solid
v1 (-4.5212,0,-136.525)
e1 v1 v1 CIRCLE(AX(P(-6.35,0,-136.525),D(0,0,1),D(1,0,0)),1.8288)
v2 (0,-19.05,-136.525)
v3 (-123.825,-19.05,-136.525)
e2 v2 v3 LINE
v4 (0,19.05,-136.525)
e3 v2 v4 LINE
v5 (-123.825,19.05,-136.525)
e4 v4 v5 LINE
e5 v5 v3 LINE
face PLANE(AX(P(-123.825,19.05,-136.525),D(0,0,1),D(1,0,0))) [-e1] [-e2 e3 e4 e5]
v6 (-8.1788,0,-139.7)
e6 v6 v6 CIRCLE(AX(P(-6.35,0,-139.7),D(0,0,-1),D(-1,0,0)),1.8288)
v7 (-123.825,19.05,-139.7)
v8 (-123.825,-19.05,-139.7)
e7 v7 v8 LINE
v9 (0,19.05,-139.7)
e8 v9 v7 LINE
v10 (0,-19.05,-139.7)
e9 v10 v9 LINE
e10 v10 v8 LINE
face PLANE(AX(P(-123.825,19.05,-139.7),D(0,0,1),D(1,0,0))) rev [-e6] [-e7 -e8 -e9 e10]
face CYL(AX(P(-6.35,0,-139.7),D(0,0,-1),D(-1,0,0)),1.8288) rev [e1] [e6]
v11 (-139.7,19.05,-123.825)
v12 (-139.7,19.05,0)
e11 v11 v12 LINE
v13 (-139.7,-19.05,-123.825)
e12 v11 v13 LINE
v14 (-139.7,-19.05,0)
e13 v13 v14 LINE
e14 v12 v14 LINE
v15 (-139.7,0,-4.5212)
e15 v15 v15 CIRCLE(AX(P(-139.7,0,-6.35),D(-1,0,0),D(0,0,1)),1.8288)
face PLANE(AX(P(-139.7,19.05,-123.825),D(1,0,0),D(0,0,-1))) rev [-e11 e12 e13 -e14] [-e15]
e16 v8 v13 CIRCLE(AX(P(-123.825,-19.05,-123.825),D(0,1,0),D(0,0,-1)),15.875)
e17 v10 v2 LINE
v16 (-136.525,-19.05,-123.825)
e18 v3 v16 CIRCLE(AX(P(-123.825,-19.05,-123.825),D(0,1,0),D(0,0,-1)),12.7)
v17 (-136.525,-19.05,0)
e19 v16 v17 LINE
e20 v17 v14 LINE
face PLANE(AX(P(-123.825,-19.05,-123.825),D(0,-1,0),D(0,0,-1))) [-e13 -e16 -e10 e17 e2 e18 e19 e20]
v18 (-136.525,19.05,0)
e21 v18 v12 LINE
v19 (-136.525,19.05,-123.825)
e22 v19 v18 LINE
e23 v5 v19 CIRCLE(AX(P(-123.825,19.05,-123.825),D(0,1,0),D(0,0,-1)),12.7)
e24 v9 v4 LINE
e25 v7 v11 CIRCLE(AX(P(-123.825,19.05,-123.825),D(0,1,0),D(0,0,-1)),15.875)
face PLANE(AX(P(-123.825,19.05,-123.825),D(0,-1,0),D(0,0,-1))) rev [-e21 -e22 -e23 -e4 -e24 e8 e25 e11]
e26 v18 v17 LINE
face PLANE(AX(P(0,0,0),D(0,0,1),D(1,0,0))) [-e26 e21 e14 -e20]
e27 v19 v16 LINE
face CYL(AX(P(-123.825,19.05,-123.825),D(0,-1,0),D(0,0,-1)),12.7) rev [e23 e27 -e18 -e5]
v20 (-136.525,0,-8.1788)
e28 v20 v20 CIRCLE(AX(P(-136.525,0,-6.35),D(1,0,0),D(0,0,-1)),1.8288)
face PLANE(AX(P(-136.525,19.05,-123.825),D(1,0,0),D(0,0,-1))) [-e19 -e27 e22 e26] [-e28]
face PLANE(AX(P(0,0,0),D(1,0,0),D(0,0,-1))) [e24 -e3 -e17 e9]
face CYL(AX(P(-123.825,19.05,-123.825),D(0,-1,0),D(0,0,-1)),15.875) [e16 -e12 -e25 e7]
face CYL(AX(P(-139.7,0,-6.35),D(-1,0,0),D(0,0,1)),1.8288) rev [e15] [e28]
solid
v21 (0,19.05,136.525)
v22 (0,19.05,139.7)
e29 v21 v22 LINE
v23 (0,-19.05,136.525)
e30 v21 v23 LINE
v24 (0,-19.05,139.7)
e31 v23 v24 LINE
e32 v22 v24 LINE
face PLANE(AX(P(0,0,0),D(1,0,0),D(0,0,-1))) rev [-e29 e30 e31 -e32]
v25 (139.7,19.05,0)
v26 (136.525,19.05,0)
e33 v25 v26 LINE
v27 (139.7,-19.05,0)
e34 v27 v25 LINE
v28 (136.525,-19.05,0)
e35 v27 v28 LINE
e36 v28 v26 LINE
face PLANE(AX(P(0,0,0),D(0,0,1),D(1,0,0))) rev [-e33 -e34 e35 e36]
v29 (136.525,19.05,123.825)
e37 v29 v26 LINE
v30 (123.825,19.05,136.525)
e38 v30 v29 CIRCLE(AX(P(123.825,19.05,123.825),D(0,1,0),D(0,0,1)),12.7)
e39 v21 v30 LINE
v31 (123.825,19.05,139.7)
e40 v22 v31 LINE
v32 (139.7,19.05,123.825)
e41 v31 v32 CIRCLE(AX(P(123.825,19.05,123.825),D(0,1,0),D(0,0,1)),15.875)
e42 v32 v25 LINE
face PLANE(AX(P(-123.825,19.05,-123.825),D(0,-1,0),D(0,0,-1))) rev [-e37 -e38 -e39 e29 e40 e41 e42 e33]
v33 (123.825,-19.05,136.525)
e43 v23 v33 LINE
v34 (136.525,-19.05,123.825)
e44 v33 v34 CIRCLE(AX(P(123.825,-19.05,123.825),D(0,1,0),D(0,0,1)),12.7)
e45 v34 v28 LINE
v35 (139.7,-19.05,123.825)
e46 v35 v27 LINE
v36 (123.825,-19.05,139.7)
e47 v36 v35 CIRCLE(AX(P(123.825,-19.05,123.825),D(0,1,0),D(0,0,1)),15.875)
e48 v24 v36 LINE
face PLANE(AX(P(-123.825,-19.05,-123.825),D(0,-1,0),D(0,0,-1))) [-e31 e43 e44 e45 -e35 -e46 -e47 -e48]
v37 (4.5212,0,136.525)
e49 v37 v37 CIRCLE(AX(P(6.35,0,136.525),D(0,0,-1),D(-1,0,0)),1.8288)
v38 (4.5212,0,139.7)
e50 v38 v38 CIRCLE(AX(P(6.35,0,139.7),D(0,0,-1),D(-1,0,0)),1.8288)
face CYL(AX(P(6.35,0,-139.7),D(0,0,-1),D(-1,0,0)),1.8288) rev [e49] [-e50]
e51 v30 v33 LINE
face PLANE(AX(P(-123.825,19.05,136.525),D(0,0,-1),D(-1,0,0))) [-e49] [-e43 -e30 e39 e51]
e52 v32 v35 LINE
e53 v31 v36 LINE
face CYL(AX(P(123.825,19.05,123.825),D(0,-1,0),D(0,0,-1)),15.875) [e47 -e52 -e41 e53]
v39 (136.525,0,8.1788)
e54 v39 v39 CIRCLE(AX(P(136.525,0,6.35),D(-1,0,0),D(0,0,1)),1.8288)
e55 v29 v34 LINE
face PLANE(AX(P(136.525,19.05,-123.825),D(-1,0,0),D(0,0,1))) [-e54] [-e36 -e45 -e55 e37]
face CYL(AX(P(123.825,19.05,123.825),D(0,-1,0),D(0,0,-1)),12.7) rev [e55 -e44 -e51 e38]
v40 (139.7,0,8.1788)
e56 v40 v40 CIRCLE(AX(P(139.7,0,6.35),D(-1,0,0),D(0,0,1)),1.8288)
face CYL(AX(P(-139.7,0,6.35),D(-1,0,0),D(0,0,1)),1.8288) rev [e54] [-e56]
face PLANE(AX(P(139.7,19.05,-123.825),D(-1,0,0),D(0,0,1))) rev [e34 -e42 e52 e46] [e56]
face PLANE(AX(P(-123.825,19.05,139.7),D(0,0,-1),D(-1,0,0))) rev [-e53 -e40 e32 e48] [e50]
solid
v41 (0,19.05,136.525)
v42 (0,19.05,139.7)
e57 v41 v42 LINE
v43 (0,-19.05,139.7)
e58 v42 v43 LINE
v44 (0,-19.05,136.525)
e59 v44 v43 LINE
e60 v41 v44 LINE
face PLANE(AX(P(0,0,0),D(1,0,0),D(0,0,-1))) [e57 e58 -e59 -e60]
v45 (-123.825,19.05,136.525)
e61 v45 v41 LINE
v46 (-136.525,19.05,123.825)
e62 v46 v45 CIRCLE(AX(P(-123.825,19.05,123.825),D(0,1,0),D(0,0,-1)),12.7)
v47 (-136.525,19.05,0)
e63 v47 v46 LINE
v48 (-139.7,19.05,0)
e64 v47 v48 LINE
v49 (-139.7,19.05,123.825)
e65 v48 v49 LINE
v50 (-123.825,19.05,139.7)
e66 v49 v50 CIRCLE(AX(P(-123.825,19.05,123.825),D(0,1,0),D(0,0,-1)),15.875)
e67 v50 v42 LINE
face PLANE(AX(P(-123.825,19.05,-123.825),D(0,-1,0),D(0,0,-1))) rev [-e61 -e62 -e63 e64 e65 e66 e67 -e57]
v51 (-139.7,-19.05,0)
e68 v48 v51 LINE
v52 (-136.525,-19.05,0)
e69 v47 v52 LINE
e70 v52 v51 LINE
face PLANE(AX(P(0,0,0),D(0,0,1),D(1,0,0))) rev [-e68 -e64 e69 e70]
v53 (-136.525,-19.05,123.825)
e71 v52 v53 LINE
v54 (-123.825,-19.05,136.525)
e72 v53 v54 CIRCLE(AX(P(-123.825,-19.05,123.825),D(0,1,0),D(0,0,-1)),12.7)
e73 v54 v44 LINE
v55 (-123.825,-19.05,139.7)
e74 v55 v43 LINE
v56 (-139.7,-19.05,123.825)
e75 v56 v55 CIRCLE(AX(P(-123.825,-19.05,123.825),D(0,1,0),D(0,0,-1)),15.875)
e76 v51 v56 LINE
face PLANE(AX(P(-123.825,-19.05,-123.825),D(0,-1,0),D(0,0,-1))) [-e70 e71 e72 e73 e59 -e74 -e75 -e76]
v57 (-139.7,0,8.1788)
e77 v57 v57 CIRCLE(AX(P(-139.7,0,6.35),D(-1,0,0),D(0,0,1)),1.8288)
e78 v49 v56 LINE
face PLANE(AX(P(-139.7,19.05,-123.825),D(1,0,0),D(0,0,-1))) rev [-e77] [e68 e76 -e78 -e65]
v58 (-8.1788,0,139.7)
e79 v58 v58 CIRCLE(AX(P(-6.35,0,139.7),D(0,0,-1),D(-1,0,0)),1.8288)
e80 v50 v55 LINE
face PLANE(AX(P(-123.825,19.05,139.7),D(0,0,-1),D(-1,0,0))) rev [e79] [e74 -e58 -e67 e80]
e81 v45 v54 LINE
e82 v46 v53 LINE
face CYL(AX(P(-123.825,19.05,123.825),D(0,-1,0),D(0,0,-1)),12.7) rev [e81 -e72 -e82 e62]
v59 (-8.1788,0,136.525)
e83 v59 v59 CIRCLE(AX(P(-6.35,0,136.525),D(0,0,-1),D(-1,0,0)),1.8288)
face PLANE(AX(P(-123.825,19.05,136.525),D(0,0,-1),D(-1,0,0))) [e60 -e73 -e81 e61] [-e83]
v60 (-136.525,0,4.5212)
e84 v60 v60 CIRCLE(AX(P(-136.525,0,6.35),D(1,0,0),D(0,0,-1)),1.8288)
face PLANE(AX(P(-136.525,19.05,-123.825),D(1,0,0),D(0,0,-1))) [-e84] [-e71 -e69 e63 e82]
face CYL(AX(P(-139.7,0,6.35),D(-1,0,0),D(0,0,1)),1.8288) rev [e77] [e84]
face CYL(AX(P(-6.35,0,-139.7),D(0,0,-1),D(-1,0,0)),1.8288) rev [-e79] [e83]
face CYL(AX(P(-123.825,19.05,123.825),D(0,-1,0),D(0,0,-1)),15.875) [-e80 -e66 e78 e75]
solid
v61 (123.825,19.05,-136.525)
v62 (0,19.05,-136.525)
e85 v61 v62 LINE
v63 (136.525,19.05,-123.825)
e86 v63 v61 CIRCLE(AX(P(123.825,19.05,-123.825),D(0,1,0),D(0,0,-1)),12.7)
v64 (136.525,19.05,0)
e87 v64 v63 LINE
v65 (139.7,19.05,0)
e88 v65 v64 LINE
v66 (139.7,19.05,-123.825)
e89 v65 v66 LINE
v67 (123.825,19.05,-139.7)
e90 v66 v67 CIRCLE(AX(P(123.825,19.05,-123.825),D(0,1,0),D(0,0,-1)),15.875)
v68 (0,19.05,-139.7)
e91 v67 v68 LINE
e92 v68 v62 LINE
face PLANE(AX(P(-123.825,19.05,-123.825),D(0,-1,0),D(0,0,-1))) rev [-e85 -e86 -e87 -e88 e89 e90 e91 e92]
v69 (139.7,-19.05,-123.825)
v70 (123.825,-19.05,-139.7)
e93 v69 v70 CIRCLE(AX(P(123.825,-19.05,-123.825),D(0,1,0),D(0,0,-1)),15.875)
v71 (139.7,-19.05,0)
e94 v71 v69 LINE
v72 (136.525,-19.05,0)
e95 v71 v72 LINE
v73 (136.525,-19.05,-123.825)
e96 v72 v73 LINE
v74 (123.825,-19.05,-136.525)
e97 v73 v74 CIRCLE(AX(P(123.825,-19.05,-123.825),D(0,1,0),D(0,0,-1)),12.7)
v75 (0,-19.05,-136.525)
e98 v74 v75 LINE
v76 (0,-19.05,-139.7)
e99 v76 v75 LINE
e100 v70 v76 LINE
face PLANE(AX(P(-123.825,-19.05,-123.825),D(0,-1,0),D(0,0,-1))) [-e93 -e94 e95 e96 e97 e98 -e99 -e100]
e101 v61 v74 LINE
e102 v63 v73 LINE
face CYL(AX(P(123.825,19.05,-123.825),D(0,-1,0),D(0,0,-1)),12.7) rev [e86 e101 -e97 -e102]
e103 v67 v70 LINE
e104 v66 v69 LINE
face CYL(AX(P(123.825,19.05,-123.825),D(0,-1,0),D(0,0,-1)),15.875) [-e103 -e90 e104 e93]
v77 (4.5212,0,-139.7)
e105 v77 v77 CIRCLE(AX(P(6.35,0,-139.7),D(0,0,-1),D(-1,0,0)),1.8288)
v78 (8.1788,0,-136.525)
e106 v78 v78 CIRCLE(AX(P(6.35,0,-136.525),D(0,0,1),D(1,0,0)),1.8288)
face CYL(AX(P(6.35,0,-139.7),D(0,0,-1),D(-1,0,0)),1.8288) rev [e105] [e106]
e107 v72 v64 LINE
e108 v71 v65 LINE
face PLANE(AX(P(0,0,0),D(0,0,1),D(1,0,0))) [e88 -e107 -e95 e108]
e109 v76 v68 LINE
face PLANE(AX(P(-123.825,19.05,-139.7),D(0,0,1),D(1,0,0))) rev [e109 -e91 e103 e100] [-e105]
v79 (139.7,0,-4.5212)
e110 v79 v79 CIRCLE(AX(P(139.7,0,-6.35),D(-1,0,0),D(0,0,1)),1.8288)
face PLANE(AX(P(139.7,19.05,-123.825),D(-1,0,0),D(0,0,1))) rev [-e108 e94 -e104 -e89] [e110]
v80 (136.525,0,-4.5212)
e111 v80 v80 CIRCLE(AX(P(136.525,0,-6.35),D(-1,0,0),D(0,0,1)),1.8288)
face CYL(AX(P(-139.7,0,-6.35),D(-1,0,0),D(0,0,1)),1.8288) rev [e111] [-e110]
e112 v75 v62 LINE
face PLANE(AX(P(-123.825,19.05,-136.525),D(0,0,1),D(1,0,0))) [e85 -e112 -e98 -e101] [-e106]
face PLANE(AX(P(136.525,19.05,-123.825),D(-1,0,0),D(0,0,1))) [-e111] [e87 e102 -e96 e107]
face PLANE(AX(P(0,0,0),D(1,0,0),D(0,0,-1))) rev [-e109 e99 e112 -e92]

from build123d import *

# Parameters (mm, degrees)
BOSS_EXTRUDE1_DEPTH            = 19.05
SPLIT1_START                   = -19.05
SPLIT1_DEPTH                   = 38.1
SPLIT1_START_2                 = -139.7
SPLIT1_2_OUTLINE_W             = 38.1
SPLIT1_2_OUTLINE_H             = 279.4
SPLIT1_2_DEPTH                 = 139.7
SPLIT1_3_OUTLINE_W             = 38.1
SPLIT1_3_OUTLINE_H             = 139.7
SPLIT1_3_DEPTH                 = 139.7
SPLIT1_4_DEPTH                 = 38.1
SPLIT1_5_DEPTH                 = 38.1
SKETCH6_W                      = 1.8288
SKETCH6_H                      = 279.4
F_6_CLEARANCE_HOLE1_AT_2_COUNT = 2
F_6_CLEARANCE_HOLE1_AT_2_PITCH = 12.7
CIRPATTERN1_COUNT              = 2
CIRPATTERN1_ANGLE              = 90
CIRPATTERN1_COPY_1_SKETCH_W    = 1.8288
CIRPATTERN1_COPY_1_SKETCH_H    = 279.4


# Read off the part's stored shape, not the designer's step: Split1
with BuildPart() as part:
    # Sketch1 → Boss-Extrude1 (new, symmetric)
    with BuildSketch(Plane(origin=(0, 0, 0), x_dir=(1, 0, 0), z_dir=(0, 1, 0))):
        with BuildLine():
            Line((-123.825, 139.7), (123.825, 139.7))
            ThreePointArc((123.825, 139.7), (135.050320151, 135.050320151), (139.7, 123.825))
            Line((139.7, 123.825), (139.7, -123.825))
            ThreePointArc((139.7, -123.825), (135.050320151, -135.050320151), (123.825, -139.7))
            Line((123.825, -139.7), (-123.825, -139.7))
            ThreePointArc((-123.825, -139.7), (-135.050320151, -135.050320151), (-139.7, -123.825))
            Line((-139.7, -123.825), (-139.7, 123.825))
            ThreePointArc((-139.7, 123.825), (-135.050320151, 135.050320151), (-123.825, 139.7))
        make_face()
        with BuildLine():
            Line((-123.825, 136.525), (123.825, 136.525))
            ThreePointArc((123.825, 136.525), (132.805256121, 132.805256121), (136.525, 123.825))
            Line((136.525, 123.825), (136.525, -123.825))
            ThreePointArc((136.525, -123.825), (132.805256121, -132.805256121), (123.825, -136.525))
            Line((123.825, -136.525), (-123.825, -136.525))
            ThreePointArc((-123.825, -136.525), (-132.805256121, -132.805256121), (-136.525, -123.825))
            Line((-136.525, -123.825), (-136.525, 123.825))
            ThreePointArc((-136.525, 123.825), (-132.805256121, 132.805256121), (-123.825, 136.525))
        make_face(mode=Mode.SUBTRACT)
    extrude(amount=BOSS_EXTRUDE1_DEPTH, both=True)

    # Split1 2 outline → Split1 2 (cut)
    with BuildSketch(Plane.YZ.offset(SPLIT1_START_2)):
        Rectangle(SPLIT1_2_OUTLINE_W, SPLIT1_2_OUTLINE_H)
    extrude(amount=SPLIT1_2_DEPTH, mode=Mode.SUBTRACT)

    # Split1 3 outline → Split1 3 (cut)
    with BuildSketch(Plane.YZ):
        with Locations((0, -69.85)):
            Rectangle(SPLIT1_3_OUTLINE_W, SPLIT1_3_OUTLINE_H)
    extrude(amount=SPLIT1_3_DEPTH, mode=Mode.SUBTRACT)


with BuildPart() as body_2:
    # Split1 outline → Split1 (new body)
    with BuildSketch(Plane(origin=(0, 0, 0), x_dir=(1, 0, 0), z_dir=(0, 1, 0)).offset(SPLIT1_START)):
        with BuildLine():
            Line((-123.825, 136.525), (0, 136.525))
            Line((0, 136.525), (0, 139.7))
            Line((0, 139.7), (-123.825, 139.7))
            ThreePointArc((-123.825, 139.7), (-135.050320151, 135.050320151), (-139.7, 123.825))
            Line((-139.7, 123.825), (-139.7, 0))
            Line((-139.7, 0), (-136.525, 0))
            Line((-136.525, 0), (-136.525, 123.825))
            ThreePointArc((-136.525, 123.825), (-132.805256121, 132.805256121), (-123.825, 136.525))
        make_face()
    extrude(amount=SPLIT1_DEPTH)


with BuildPart() as body_3:
    # Split1 4 outline → Split1 4 (new body)
    with BuildSketch(Plane(origin=(0, 0, 0), x_dir=(1, 0, 0), z_dir=(0, 1, 0)).offset(SPLIT1_START)):
        with BuildLine():
            Line((-136.525, 0), (-139.7, 0))
            Line((-139.7, 0), (-139.7, -123.825))
            ThreePointArc((-139.7, -123.825), (-135.050320151, -135.050320151), (-123.825, -139.7))
            Line((-123.825, -139.7), (0, -139.7))
            Line((0, -139.7), (0, -136.525))
            Line((0, -136.525), (-123.825, -136.525))
            ThreePointArc((-123.825, -136.525), (-132.805256121, -132.805256121), (-136.525, -123.825))
            Line((-136.525, -123.825), (-136.525, 0))
        make_face()
    extrude(amount=SPLIT1_4_DEPTH)


with BuildPart() as body_4:
    # Split1 5 outline → Split1 5 (new body)
    with BuildSketch(Plane(origin=(0, 0, 0), x_dir=(1, 0, 0), z_dir=(0, 1, 0)).offset(SPLIT1_START)):
        with BuildLine():
            Line((0, 139.7), (0, 136.525))
            Line((0, 136.525), (123.825, 136.525))
            ThreePointArc((123.825, 136.525), (132.805256121, 132.805256121), (136.525, 123.825))
            Line((136.525, 123.825), (136.525, 0))
            Line((136.525, 0), (139.7, 0))
            Line((139.7, 0), (139.7, 123.825))
            ThreePointArc((139.7, 123.825), (135.050320151, 135.050320151), (123.825, 139.7))
            Line((123.825, 139.7), (0, 139.7))
        make_face()
    extrude(amount=SPLIT1_5_DEPTH)


with BuildPart() as f_6_clearance_hole1_tool:
    # Sketch6 → #6 Clearance Hole1 (revolve)
    with BuildSketch(Plane(origin=(-139.7, 0, 6.35), x_dir=(0, 0, 1), z_dir=(0, 1, 0))):
        with Locations((0.9144, 139.7)):
            Rectangle(SKETCH6_W, SKETCH6_H)
    f_6_clearance_hole1 = revolve(axis=Axis((-146.05, 0, 6.35), (1, 0, 0)))


with BuildPart() as part_1:
    add(part.part)

    # #6 Clearance Hole1: cut by f_6_clearance_hole1_tool
    add(f_6_clearance_hole1_tool.part, mode=Mode.SUBTRACT)


with BuildPart() as body_3_1:
    add(body_3.part)

    # #6 Clearance Hole1: cut by f_6_clearance_hole1_tool
    add(f_6_clearance_hole1_tool.part, mode=Mode.SUBTRACT)


with BuildPart() as f_6_clearance_hole1_at_2_tool:
    # #6 Clearance Hole1 at 2: #6 Clearance Hole1 ×2
    with Locations(*[(0, 0, -i * F_6_CLEARANCE_HOLE1_AT_2_PITCH) for i in range(1, F_6_CLEARANCE_HOLE1_AT_2_COUNT)]):
        add(f_6_clearance_hole1)


with BuildPart() as body_2_1:
    add(body_2.part)

    # #6 Clearance Hole1 at 2: cut by f_6_clearance_hole1_at_2_tool
    add(f_6_clearance_hole1_at_2_tool.part, mode=Mode.SUBTRACT)


with BuildPart() as body_4_1:
    add(body_4.part)

    # #6 Clearance Hole1 at 2: cut by f_6_clearance_hole1_at_2_tool
    add(f_6_clearance_hole1_at_2_tool.part, mode=Mode.SUBTRACT)


with BuildPart() as cirpattern1_tool:
    # CirPattern1: #6 Clearance Hole1 ×2 about axis
    cirpattern1_axis = Axis((0, 20.955, 0), (0, -1, 0))
    for i in range(1, CIRPATTERN1_COUNT):
        add(f_6_clearance_hole1.rotate(cirpattern1_axis, i * CIRPATTERN1_ANGLE / (CIRPATTERN1_COUNT - 1)))


with BuildPart() as body_2_2:
    add(body_2_1.part)

    # CirPattern1: cut by cirpattern1_tool
    add(cirpattern1_tool.part, mode=Mode.SUBTRACT)


with BuildPart() as body_3_2:
    add(body_3_1.part)

    # CirPattern1: cut by cirpattern1_tool
    add(cirpattern1_tool.part, mode=Mode.SUBTRACT)


with BuildPart() as cirpattern1_copy_1_tool:
    # CirPattern1 copy 1 sketch → CirPattern1 copy 1 (revolve)
    with BuildSketch(Plane(origin=(6.35, 0, -139.7), x_dir=(-1, 0, 0), z_dir=(0, 1, 0))):
        with Locations((0.9144, 139.7)):
            Rectangle(CIRPATTERN1_COPY_1_SKETCH_W, CIRPATTERN1_COPY_1_SKETCH_H)
    revolve(axis=Axis((6.35, 0, -146.05), (0, 0, 1)))


with BuildPart() as part_2:
    add(part_1.part)

    # CirPattern1 copy 1: cut by cirpattern1_copy_1_tool
    add(cirpattern1_copy_1_tool.part, mode=Mode.SUBTRACT)


with BuildPart() as body_4_2:
    add(body_4_1.part)

    # CirPattern1 copy 1: cut by cirpattern1_copy_1_tool
    add(cirpattern1_copy_1_tool.part, mode=Mode.SUBTRACT)


solid = Compound([body_2_2.part, body_3_2.part, part_2.part, body_4_2.part])
